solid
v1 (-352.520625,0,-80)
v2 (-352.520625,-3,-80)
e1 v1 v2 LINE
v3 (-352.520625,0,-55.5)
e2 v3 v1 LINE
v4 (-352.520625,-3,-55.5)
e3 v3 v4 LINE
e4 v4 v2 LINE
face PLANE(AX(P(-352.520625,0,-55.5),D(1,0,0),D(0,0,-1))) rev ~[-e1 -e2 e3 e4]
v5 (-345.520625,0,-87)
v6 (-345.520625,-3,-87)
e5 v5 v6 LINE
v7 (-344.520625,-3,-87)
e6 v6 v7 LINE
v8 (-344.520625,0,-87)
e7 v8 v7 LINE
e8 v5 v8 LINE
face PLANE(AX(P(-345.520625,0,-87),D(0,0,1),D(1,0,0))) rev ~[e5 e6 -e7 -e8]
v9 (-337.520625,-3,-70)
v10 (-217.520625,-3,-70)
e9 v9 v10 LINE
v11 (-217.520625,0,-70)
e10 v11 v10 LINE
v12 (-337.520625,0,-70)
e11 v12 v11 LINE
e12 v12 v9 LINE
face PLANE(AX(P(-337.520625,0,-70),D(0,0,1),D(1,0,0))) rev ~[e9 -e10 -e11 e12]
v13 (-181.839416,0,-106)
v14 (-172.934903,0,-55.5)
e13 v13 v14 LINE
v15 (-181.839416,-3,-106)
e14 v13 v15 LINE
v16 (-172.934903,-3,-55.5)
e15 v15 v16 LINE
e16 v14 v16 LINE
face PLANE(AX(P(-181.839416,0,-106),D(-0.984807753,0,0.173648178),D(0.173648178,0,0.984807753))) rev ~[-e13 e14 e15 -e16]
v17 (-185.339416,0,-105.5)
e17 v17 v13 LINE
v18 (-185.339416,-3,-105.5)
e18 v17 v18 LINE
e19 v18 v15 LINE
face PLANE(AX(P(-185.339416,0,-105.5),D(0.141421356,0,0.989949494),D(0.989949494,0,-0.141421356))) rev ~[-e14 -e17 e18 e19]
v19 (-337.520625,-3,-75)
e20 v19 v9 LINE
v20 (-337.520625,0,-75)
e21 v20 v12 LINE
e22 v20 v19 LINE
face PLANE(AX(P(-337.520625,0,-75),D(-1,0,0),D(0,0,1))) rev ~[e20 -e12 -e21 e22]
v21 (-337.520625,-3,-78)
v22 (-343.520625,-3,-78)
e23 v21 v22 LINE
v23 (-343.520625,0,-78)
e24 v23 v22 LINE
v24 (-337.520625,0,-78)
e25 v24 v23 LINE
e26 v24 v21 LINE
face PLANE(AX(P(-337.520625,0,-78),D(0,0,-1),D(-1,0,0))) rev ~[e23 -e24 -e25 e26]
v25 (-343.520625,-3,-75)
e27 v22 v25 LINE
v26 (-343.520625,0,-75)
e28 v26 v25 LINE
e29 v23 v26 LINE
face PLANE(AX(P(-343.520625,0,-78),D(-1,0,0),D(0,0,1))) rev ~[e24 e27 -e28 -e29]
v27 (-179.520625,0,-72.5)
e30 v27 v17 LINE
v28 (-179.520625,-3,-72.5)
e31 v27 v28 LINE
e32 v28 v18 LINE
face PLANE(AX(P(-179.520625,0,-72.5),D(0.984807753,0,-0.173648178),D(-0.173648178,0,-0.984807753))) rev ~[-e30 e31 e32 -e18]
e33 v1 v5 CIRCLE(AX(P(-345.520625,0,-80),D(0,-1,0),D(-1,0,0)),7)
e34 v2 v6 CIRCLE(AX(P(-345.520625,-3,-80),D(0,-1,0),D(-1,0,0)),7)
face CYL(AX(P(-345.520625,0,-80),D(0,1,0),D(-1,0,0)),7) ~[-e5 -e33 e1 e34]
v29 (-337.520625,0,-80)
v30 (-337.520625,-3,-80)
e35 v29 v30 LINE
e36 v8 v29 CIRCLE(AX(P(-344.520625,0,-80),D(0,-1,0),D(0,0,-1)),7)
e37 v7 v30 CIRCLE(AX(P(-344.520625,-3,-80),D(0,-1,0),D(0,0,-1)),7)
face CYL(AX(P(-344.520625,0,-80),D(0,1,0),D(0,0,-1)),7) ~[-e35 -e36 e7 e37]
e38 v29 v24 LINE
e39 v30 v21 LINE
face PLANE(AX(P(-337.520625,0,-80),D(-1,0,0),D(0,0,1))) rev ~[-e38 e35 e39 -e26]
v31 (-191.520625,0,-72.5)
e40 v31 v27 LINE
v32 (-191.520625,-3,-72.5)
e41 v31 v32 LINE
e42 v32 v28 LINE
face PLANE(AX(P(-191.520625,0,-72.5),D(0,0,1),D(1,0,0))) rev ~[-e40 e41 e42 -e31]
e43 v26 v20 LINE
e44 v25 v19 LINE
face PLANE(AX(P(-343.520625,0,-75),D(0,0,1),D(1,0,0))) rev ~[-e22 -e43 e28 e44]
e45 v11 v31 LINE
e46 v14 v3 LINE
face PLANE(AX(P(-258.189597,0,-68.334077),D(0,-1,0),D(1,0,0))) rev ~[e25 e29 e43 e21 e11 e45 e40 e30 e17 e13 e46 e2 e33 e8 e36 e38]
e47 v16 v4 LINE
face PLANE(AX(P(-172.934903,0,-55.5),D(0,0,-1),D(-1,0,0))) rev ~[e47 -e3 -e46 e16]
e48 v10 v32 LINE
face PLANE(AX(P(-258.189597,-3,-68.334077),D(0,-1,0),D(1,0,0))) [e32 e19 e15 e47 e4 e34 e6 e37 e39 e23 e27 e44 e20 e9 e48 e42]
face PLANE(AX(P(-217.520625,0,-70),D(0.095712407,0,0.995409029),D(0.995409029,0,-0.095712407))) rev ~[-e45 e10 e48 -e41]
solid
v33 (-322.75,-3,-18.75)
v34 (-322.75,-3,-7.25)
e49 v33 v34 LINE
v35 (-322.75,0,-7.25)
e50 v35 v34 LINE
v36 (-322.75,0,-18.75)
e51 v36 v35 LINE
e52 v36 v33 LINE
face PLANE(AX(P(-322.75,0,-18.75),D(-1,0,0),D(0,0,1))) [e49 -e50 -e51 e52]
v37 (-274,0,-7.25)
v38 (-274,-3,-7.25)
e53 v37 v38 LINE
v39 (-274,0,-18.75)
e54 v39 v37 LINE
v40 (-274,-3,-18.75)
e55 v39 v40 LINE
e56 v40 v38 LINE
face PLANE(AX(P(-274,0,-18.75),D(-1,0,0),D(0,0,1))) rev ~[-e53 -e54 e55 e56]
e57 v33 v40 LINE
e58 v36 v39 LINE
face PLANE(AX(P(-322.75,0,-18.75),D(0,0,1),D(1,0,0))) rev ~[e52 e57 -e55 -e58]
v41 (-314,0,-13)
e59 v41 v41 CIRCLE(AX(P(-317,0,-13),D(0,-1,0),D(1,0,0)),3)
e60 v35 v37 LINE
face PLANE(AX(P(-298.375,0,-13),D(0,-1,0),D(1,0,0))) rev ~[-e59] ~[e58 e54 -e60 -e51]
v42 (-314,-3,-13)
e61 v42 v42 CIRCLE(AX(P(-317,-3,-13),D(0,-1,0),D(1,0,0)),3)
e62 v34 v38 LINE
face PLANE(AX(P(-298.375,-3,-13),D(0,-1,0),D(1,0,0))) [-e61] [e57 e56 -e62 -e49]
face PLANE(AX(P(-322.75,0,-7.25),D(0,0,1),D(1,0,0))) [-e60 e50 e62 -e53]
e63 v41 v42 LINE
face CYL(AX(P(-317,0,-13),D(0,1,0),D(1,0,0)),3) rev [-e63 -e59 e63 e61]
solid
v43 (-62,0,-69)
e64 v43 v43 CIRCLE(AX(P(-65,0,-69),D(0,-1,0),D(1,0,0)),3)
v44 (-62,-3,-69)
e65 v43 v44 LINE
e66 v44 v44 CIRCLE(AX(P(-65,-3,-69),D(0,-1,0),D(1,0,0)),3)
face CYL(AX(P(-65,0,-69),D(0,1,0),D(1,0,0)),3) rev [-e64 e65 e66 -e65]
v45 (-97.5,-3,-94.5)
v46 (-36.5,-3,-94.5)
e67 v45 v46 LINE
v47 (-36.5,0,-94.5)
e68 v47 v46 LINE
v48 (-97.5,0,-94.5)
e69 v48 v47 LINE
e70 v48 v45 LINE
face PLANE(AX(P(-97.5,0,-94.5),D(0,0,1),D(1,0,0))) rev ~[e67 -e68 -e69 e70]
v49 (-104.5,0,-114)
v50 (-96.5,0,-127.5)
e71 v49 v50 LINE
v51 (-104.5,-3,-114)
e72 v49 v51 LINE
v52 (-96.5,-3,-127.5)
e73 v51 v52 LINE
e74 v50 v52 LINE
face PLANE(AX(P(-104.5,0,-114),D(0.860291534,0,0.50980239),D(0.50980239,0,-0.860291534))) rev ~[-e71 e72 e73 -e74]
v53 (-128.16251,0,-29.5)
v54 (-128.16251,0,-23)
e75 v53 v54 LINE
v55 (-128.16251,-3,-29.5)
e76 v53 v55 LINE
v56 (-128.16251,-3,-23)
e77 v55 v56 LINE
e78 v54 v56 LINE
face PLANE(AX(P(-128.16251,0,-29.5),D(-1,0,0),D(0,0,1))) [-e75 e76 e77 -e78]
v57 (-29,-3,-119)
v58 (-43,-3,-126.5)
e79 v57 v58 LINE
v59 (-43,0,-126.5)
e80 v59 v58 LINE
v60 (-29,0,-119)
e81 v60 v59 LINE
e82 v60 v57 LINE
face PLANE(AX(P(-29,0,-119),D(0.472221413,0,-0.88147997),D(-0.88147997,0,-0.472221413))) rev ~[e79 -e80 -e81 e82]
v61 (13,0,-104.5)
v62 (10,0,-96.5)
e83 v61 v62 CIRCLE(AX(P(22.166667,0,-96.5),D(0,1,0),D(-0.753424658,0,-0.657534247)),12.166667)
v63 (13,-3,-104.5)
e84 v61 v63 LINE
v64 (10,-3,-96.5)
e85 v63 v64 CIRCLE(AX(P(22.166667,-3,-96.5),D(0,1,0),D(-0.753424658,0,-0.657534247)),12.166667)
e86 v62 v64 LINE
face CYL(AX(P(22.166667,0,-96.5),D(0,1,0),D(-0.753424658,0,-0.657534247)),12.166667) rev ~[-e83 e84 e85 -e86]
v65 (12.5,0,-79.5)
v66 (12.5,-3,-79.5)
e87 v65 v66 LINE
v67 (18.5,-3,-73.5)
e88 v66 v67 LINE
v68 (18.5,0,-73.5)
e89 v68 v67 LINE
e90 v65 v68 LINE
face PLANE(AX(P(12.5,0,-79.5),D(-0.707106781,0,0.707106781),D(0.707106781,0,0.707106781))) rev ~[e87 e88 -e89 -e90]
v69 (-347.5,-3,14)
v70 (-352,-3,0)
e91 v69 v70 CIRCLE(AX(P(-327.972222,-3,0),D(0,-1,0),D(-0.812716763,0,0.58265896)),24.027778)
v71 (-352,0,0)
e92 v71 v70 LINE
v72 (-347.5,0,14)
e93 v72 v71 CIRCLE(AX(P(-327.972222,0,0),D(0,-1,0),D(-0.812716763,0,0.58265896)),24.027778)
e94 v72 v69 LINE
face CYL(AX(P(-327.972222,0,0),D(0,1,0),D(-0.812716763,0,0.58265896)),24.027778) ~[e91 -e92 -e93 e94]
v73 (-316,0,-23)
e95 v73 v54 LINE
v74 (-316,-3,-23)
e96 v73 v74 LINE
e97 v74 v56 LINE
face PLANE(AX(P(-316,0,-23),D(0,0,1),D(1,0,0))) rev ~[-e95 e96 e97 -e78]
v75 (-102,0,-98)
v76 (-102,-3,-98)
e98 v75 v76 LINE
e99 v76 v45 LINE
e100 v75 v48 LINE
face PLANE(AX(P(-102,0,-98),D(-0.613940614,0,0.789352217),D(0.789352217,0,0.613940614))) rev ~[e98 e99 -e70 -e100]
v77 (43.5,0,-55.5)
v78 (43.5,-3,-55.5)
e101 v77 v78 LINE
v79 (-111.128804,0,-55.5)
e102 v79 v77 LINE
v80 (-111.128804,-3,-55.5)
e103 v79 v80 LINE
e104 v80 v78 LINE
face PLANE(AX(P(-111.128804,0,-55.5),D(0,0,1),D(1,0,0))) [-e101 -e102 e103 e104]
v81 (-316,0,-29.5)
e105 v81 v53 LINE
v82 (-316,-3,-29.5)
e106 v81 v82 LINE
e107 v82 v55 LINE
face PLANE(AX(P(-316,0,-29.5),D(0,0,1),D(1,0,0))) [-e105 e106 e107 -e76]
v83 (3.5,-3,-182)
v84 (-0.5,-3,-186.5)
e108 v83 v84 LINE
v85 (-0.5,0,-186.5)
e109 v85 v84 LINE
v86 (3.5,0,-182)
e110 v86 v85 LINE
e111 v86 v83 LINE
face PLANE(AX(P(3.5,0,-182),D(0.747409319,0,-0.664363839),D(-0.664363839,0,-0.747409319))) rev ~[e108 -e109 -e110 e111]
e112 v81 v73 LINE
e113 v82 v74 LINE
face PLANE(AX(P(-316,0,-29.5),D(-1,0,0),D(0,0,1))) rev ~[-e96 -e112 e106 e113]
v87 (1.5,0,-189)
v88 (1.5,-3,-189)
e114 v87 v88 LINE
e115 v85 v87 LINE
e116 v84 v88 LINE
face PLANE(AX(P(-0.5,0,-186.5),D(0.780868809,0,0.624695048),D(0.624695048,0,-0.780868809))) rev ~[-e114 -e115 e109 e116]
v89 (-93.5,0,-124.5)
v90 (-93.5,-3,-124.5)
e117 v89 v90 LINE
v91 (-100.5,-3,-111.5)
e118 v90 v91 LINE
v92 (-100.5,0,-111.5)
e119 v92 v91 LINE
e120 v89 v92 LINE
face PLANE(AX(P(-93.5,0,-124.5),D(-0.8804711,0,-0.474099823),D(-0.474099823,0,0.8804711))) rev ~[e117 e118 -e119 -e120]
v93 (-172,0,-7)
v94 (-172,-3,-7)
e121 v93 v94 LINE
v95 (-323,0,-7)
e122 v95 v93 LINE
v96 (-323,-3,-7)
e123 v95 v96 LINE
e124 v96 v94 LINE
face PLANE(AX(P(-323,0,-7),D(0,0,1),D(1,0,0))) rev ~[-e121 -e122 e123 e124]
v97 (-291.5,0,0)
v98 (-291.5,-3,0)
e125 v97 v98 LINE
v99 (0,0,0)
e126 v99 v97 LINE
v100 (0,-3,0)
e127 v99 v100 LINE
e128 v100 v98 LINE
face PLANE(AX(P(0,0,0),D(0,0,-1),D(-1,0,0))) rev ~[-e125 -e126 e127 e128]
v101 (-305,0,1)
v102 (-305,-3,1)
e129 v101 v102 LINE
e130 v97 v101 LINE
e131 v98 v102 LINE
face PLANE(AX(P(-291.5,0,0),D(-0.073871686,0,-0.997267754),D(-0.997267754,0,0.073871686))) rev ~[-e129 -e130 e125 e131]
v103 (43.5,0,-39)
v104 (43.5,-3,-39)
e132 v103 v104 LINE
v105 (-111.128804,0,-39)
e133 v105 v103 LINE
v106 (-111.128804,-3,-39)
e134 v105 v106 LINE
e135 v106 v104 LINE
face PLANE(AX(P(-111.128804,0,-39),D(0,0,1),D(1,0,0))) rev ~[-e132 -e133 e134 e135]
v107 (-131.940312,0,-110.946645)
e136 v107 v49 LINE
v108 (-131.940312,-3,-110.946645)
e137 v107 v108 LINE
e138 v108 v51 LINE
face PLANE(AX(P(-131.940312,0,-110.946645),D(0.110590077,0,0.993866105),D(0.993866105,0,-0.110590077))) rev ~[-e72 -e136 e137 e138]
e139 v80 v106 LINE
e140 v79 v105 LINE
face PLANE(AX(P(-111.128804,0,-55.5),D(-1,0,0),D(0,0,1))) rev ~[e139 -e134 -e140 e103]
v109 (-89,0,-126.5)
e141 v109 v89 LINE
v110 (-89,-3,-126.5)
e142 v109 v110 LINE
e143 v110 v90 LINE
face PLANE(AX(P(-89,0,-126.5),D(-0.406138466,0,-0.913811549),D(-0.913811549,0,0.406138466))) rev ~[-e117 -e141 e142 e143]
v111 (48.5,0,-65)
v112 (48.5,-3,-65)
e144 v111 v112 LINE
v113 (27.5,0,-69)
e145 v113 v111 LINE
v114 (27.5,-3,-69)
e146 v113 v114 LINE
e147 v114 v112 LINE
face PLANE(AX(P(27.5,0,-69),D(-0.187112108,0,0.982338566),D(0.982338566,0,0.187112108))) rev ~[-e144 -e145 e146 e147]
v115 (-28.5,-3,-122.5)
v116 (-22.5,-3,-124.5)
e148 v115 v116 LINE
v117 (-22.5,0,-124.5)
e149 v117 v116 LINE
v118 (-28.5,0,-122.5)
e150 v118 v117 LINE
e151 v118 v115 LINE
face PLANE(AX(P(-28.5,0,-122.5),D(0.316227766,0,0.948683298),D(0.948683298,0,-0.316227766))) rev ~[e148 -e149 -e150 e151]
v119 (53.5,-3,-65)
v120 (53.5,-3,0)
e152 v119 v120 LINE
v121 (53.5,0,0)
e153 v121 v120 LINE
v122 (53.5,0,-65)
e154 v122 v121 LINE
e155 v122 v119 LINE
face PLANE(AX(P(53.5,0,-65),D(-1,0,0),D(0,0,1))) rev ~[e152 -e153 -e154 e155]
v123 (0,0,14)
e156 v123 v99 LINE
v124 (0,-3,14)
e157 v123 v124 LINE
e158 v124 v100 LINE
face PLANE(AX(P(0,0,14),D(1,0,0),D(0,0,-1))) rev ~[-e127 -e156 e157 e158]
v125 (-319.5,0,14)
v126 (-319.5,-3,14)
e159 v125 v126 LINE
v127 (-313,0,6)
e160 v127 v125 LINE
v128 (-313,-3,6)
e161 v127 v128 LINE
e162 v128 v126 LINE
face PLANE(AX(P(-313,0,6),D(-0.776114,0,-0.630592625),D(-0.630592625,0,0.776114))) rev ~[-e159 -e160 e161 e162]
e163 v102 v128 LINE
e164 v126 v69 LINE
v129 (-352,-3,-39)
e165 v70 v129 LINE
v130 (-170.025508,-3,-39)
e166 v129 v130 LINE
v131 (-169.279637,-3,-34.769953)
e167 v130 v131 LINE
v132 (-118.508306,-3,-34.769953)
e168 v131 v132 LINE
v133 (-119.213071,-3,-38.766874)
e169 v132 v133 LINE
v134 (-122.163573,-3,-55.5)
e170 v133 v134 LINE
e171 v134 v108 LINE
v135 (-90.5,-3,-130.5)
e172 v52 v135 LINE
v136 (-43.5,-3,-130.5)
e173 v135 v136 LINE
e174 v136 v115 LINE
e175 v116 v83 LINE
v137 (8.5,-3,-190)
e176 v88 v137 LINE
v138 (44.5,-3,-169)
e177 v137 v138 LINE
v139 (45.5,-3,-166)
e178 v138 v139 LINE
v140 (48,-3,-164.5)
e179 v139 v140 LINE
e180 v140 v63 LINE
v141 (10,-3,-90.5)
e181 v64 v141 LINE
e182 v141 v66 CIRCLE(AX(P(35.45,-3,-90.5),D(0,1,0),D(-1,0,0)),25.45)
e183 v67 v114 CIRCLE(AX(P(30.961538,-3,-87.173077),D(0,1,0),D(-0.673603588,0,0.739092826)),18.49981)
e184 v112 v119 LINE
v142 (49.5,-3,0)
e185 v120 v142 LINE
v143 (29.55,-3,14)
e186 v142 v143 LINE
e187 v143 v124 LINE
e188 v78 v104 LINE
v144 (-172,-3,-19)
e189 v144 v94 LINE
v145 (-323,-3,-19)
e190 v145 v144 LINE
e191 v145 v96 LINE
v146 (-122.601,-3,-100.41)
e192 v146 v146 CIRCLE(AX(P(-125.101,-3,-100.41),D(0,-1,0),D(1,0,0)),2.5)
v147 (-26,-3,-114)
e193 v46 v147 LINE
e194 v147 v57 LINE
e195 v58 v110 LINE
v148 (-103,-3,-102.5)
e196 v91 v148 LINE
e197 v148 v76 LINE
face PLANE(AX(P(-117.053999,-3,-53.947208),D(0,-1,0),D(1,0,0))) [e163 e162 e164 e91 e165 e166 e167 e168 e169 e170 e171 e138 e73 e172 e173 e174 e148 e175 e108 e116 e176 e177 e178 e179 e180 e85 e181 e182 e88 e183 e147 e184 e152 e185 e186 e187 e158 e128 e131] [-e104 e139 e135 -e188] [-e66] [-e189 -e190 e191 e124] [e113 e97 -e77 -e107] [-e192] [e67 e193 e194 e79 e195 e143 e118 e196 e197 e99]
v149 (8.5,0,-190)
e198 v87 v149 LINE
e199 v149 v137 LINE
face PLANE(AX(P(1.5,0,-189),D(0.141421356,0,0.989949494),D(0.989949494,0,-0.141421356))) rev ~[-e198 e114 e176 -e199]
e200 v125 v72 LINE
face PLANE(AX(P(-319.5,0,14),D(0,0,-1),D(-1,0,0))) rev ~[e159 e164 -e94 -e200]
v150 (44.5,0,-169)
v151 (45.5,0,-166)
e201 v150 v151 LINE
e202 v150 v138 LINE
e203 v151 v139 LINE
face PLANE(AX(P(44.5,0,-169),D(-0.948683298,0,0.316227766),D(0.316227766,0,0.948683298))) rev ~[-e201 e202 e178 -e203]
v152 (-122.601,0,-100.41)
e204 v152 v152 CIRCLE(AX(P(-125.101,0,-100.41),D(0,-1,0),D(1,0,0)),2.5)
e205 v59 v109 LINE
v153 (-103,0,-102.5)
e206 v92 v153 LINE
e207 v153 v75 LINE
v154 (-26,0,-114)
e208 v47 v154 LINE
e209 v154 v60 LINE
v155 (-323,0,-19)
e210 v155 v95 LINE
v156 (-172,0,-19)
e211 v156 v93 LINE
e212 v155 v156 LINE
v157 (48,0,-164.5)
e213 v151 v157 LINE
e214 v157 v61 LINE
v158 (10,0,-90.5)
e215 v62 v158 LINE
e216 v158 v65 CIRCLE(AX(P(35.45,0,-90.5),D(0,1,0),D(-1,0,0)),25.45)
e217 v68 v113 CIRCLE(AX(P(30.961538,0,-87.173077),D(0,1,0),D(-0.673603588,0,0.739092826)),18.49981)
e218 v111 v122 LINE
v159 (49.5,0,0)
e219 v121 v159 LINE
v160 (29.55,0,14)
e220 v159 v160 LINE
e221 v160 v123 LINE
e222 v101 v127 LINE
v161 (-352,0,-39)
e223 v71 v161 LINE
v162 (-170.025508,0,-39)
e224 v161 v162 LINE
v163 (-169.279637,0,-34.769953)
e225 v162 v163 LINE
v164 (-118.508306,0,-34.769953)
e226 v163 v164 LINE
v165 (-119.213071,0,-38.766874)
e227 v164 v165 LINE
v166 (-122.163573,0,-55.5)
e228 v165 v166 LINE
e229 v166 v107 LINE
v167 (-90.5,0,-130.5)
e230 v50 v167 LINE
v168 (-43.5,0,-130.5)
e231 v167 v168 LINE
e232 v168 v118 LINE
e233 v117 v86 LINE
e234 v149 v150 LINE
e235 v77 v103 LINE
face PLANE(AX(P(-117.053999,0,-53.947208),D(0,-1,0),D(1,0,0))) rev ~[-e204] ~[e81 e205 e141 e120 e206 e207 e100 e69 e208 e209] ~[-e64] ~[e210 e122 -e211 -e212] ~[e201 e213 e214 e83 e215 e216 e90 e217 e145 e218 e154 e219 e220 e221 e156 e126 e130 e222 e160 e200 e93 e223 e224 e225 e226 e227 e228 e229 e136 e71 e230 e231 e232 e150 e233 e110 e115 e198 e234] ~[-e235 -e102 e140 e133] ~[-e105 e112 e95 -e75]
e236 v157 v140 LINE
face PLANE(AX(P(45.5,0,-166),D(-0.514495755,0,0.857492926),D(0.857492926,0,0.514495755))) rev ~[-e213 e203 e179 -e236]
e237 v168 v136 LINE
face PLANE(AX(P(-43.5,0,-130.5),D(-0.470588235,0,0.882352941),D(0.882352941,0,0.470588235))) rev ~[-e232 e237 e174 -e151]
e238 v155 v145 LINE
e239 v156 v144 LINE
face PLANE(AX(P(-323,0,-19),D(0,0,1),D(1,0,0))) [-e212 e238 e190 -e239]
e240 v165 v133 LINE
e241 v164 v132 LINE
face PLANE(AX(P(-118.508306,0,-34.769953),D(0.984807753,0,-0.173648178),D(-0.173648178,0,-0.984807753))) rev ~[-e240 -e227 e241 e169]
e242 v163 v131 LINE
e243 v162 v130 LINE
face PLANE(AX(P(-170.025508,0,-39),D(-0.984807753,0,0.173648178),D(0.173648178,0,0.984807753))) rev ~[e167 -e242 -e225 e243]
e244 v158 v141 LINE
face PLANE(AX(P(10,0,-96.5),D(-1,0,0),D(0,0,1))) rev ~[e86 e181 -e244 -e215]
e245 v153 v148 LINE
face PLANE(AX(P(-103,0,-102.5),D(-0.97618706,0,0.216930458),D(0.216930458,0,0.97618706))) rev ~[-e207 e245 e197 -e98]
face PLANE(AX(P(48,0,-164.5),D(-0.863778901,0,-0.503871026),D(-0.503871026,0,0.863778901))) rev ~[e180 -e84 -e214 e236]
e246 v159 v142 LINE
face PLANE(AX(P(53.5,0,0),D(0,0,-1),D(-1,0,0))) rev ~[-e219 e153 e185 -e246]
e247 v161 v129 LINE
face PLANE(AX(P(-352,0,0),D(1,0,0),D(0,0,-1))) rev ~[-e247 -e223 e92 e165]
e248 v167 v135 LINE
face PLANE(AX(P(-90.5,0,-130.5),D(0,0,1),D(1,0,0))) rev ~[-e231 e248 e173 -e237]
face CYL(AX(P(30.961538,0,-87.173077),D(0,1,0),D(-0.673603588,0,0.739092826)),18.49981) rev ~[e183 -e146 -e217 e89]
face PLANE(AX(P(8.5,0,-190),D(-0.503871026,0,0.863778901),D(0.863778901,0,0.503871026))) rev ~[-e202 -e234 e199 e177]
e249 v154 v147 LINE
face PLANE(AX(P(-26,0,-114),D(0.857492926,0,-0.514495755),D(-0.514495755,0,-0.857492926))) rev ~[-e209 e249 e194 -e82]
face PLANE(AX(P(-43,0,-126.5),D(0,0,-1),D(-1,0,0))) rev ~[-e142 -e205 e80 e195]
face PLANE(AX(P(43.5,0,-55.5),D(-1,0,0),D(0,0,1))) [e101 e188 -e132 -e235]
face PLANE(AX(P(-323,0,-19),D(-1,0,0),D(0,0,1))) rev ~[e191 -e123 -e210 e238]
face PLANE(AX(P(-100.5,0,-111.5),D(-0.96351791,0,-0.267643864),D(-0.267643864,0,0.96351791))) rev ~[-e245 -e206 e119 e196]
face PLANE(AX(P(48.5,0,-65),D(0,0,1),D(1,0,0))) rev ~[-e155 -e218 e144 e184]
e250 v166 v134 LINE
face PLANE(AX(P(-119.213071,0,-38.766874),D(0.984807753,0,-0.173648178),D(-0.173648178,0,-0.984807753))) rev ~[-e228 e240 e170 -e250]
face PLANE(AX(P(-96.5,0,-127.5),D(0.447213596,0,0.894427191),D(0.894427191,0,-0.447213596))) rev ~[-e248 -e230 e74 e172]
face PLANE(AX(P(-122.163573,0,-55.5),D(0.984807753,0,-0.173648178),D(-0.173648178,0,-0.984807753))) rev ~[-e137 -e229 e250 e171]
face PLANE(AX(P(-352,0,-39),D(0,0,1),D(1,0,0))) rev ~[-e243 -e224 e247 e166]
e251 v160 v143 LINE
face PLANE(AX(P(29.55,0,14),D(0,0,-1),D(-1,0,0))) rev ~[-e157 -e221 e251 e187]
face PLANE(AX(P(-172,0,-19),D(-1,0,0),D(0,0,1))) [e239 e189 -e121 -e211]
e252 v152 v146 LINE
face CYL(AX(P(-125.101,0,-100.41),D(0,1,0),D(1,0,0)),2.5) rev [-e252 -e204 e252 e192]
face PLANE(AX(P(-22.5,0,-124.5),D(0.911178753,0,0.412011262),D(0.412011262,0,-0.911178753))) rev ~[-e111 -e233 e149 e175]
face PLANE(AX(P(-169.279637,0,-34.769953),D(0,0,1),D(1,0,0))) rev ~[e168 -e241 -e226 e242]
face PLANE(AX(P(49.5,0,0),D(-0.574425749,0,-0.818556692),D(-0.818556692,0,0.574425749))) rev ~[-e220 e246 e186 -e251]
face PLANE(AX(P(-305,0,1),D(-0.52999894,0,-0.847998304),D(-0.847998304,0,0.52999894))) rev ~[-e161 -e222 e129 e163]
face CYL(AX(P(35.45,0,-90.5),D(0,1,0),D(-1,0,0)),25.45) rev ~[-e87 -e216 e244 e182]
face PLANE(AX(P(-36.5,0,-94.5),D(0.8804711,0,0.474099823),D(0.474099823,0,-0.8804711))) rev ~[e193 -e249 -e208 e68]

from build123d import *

# Parameters (mm, degrees)
F0_R     = 2.5
F0_W     = 187.8374901577
F0_H     = 6.5
F0_W_2   = 151
F0_H_2   = 12
F0_R_2   = 3
F0_W_3   = 154.6288044202
F0_H_3   = 16.5
F1_DEPTH = 3
F0_W_4   = 48.75
F0_H_4   = 11.5


with BuildPart() as f1:
    # F0 (on Front) → F1 (new body)
    with BuildSketch(Plane.XZ):
        with BuildLine():
            Line((48.5, -65), (53.5, -65))
            Line((53.5, -65), (53.5, 0))
            Line((53.5, 0), (49.5, 0))
            Line((49.5, 0), (29.55, 14))
            Line((29.55, 14), (0, 14))
            Line((0, 14), (0, 0))
            Line((0, 0), (-291.5, 0))
            Line((-291.5, 0), (-305, 1))
            Line((-305, 1), (-313, 6))
            Line((-313, 6), (-319.5, 14))
            Line((-319.5, 14), (-347.5, 14))
            ThreePointArc((-347.5, 14), (-350.8473529309, 7.3527205849), (-352, 0))
            Line((-352, 0), (-352, -39))
            Line((-352, -39), (-170.0255081496, -39))
            Line((-170.0255081496, -39), (-169.2796367248, -34.7699529486))
            Line((-169.2796367248, -34.7699529486), (-118.5083061305, -34.7699529486))
            Line((-118.5083061305, -34.7699529486), (-119.2130711177, -38.7668738074))
            Line((-119.2130711177, -38.7668738074), (-122.163572737, -55.5))
            Line((-122.163572737, -55.5), (-131.940312204, -110.9466447942))
            Line((-131.940312204, -110.9466447942), (-104.5, -114))
            Line((-104.5, -114), (-96.5, -127.5))
            Line((-96.5, -127.5), (-90.5, -130.5))
            Line((-90.5, -130.5), (-43.5, -130.5))
            Line((-43.5, -130.5), (-28.5, -122.5))
            Line((-28.5, -122.5), (-22.5, -124.5))
            Line((-22.5, -124.5), (3.5, -182))
            Line((3.5, -182), (-0.5, -186.5))
            Line((-0.5, -186.5), (1.5, -189))
            Line((1.5, -189), (8.5, -190))
            Line((8.5, -190), (44.5, -169))
            Line((44.5, -169), (45.5, -166))
            Line((45.5, -166), (48, -164.5))
            Line((48, -164.5), (13, -104.5))
            ThreePointArc((13, -104.5), (10.7746616729, -100.7720018727), (10, -96.5))
            Line((10, -96.5), (10, -90.5))
            ThreePointArc((10, -90.5), (10.6328688201, -84.8597429137), (12.5, -79.5))
            Line((12.5, -79.5), (18.5, -73.5))
            ThreePointArc((18.5, -73.5), (22.688171875, -70.6263437501), (27.5, -69))
            Line((27.5, -69), (48.5, -65))
        make_face()
        with Locations((-125.101, -100.41)):
            Circle(F0_R, mode=Mode.SUBTRACT)
        Polygon((-36.5, -94.5), (-26, -114), (-29, -119), (-43, -126.5), (-89, -126.5), (-93.5, -124.5), (-100.5, -111.5), (-103, -102.5), (-102, -98), (-97.5, -94.5), align=None, mode=Mode.SUBTRACT)
        with Locations((-222.0812549212, -26.25)):
            Rectangle(F0_W, F0_H, mode=Mode.SUBTRACT)
        with Locations((-247.5, -13)):
            Rectangle(F0_W_2, F0_H_2, mode=Mode.SUBTRACT)
        with Locations((-65, -69)):
            Circle(F0_R_2, mode=Mode.SUBTRACT)
        with Locations((-33.8144022101, -47.25)):
            Rectangle(F0_W_3, F0_H_3, mode=Mode.SUBTRACT)
    extrude(amount=F1_DEPTH)


with BuildPart() as f1b:
    # F0 (on Front) → F1, piece 2 (new body)
    with BuildSketch(Plane.XZ):
        with BuildLine():
            ThreePointArc((-352.5206254937, -80), (-350.470372962, -84.9497474683), (-345.5206254937, -87))
            Line((-345.5206254937, -87), (-344.5206254937, -87))
            ThreePointArc((-344.5206254937, -87), (-339.5708780254, -84.9497474683), (-337.5206254937, -80))
            Line((-337.5206254937, -80), (-337.5206254937, -78))
            Line((-337.5206254937, -78), (-343.5206254937, -78))
            Line((-343.5206254937, -78), (-343.5206254937, -75))
            Line((-343.5206254937, -75), (-337.5206254937, -75))
            Line((-337.5206254937, -75), (-337.5206254937, -70))
            Line((-337.5206254937, -70), (-217.5206254937, -70))
            Line((-217.5206254937, -70), (-191.5206254937, -72.5))
            Line((-191.5206254937, -72.5), (-179.5206254937, -72.5))
            Line((-179.5206254937, -72.5), (-185.3394158571, -105.5))
            Line((-185.3394158571, -105.5), (-181.8394158571, -106))
            Line((-181.8394158571, -106), (-172.9349033313, -55.5))
            Line((-172.9349033313, -55.5), (-352.5206254937, -55.5))
            Line((-352.5206254937, -55.5), (-352.5206254937, -80))
        make_face()
    extrude(amount=F1_DEPTH)


with BuildPart() as f1c:
    # F0 (on Front) → F1, piece 3 (new body)
    with BuildSketch(Plane.XZ):
        with Locations((-298.375, -13)):
            Rectangle(F0_W_4, F0_H_4)
        with Locations((-317, -13)):
            Circle(F0_R_2, mode=Mode.SUBTRACT)
    extrude(amount=F1_DEPTH)


solid = Compound([f1.part, f1b.part, f1c.part])
